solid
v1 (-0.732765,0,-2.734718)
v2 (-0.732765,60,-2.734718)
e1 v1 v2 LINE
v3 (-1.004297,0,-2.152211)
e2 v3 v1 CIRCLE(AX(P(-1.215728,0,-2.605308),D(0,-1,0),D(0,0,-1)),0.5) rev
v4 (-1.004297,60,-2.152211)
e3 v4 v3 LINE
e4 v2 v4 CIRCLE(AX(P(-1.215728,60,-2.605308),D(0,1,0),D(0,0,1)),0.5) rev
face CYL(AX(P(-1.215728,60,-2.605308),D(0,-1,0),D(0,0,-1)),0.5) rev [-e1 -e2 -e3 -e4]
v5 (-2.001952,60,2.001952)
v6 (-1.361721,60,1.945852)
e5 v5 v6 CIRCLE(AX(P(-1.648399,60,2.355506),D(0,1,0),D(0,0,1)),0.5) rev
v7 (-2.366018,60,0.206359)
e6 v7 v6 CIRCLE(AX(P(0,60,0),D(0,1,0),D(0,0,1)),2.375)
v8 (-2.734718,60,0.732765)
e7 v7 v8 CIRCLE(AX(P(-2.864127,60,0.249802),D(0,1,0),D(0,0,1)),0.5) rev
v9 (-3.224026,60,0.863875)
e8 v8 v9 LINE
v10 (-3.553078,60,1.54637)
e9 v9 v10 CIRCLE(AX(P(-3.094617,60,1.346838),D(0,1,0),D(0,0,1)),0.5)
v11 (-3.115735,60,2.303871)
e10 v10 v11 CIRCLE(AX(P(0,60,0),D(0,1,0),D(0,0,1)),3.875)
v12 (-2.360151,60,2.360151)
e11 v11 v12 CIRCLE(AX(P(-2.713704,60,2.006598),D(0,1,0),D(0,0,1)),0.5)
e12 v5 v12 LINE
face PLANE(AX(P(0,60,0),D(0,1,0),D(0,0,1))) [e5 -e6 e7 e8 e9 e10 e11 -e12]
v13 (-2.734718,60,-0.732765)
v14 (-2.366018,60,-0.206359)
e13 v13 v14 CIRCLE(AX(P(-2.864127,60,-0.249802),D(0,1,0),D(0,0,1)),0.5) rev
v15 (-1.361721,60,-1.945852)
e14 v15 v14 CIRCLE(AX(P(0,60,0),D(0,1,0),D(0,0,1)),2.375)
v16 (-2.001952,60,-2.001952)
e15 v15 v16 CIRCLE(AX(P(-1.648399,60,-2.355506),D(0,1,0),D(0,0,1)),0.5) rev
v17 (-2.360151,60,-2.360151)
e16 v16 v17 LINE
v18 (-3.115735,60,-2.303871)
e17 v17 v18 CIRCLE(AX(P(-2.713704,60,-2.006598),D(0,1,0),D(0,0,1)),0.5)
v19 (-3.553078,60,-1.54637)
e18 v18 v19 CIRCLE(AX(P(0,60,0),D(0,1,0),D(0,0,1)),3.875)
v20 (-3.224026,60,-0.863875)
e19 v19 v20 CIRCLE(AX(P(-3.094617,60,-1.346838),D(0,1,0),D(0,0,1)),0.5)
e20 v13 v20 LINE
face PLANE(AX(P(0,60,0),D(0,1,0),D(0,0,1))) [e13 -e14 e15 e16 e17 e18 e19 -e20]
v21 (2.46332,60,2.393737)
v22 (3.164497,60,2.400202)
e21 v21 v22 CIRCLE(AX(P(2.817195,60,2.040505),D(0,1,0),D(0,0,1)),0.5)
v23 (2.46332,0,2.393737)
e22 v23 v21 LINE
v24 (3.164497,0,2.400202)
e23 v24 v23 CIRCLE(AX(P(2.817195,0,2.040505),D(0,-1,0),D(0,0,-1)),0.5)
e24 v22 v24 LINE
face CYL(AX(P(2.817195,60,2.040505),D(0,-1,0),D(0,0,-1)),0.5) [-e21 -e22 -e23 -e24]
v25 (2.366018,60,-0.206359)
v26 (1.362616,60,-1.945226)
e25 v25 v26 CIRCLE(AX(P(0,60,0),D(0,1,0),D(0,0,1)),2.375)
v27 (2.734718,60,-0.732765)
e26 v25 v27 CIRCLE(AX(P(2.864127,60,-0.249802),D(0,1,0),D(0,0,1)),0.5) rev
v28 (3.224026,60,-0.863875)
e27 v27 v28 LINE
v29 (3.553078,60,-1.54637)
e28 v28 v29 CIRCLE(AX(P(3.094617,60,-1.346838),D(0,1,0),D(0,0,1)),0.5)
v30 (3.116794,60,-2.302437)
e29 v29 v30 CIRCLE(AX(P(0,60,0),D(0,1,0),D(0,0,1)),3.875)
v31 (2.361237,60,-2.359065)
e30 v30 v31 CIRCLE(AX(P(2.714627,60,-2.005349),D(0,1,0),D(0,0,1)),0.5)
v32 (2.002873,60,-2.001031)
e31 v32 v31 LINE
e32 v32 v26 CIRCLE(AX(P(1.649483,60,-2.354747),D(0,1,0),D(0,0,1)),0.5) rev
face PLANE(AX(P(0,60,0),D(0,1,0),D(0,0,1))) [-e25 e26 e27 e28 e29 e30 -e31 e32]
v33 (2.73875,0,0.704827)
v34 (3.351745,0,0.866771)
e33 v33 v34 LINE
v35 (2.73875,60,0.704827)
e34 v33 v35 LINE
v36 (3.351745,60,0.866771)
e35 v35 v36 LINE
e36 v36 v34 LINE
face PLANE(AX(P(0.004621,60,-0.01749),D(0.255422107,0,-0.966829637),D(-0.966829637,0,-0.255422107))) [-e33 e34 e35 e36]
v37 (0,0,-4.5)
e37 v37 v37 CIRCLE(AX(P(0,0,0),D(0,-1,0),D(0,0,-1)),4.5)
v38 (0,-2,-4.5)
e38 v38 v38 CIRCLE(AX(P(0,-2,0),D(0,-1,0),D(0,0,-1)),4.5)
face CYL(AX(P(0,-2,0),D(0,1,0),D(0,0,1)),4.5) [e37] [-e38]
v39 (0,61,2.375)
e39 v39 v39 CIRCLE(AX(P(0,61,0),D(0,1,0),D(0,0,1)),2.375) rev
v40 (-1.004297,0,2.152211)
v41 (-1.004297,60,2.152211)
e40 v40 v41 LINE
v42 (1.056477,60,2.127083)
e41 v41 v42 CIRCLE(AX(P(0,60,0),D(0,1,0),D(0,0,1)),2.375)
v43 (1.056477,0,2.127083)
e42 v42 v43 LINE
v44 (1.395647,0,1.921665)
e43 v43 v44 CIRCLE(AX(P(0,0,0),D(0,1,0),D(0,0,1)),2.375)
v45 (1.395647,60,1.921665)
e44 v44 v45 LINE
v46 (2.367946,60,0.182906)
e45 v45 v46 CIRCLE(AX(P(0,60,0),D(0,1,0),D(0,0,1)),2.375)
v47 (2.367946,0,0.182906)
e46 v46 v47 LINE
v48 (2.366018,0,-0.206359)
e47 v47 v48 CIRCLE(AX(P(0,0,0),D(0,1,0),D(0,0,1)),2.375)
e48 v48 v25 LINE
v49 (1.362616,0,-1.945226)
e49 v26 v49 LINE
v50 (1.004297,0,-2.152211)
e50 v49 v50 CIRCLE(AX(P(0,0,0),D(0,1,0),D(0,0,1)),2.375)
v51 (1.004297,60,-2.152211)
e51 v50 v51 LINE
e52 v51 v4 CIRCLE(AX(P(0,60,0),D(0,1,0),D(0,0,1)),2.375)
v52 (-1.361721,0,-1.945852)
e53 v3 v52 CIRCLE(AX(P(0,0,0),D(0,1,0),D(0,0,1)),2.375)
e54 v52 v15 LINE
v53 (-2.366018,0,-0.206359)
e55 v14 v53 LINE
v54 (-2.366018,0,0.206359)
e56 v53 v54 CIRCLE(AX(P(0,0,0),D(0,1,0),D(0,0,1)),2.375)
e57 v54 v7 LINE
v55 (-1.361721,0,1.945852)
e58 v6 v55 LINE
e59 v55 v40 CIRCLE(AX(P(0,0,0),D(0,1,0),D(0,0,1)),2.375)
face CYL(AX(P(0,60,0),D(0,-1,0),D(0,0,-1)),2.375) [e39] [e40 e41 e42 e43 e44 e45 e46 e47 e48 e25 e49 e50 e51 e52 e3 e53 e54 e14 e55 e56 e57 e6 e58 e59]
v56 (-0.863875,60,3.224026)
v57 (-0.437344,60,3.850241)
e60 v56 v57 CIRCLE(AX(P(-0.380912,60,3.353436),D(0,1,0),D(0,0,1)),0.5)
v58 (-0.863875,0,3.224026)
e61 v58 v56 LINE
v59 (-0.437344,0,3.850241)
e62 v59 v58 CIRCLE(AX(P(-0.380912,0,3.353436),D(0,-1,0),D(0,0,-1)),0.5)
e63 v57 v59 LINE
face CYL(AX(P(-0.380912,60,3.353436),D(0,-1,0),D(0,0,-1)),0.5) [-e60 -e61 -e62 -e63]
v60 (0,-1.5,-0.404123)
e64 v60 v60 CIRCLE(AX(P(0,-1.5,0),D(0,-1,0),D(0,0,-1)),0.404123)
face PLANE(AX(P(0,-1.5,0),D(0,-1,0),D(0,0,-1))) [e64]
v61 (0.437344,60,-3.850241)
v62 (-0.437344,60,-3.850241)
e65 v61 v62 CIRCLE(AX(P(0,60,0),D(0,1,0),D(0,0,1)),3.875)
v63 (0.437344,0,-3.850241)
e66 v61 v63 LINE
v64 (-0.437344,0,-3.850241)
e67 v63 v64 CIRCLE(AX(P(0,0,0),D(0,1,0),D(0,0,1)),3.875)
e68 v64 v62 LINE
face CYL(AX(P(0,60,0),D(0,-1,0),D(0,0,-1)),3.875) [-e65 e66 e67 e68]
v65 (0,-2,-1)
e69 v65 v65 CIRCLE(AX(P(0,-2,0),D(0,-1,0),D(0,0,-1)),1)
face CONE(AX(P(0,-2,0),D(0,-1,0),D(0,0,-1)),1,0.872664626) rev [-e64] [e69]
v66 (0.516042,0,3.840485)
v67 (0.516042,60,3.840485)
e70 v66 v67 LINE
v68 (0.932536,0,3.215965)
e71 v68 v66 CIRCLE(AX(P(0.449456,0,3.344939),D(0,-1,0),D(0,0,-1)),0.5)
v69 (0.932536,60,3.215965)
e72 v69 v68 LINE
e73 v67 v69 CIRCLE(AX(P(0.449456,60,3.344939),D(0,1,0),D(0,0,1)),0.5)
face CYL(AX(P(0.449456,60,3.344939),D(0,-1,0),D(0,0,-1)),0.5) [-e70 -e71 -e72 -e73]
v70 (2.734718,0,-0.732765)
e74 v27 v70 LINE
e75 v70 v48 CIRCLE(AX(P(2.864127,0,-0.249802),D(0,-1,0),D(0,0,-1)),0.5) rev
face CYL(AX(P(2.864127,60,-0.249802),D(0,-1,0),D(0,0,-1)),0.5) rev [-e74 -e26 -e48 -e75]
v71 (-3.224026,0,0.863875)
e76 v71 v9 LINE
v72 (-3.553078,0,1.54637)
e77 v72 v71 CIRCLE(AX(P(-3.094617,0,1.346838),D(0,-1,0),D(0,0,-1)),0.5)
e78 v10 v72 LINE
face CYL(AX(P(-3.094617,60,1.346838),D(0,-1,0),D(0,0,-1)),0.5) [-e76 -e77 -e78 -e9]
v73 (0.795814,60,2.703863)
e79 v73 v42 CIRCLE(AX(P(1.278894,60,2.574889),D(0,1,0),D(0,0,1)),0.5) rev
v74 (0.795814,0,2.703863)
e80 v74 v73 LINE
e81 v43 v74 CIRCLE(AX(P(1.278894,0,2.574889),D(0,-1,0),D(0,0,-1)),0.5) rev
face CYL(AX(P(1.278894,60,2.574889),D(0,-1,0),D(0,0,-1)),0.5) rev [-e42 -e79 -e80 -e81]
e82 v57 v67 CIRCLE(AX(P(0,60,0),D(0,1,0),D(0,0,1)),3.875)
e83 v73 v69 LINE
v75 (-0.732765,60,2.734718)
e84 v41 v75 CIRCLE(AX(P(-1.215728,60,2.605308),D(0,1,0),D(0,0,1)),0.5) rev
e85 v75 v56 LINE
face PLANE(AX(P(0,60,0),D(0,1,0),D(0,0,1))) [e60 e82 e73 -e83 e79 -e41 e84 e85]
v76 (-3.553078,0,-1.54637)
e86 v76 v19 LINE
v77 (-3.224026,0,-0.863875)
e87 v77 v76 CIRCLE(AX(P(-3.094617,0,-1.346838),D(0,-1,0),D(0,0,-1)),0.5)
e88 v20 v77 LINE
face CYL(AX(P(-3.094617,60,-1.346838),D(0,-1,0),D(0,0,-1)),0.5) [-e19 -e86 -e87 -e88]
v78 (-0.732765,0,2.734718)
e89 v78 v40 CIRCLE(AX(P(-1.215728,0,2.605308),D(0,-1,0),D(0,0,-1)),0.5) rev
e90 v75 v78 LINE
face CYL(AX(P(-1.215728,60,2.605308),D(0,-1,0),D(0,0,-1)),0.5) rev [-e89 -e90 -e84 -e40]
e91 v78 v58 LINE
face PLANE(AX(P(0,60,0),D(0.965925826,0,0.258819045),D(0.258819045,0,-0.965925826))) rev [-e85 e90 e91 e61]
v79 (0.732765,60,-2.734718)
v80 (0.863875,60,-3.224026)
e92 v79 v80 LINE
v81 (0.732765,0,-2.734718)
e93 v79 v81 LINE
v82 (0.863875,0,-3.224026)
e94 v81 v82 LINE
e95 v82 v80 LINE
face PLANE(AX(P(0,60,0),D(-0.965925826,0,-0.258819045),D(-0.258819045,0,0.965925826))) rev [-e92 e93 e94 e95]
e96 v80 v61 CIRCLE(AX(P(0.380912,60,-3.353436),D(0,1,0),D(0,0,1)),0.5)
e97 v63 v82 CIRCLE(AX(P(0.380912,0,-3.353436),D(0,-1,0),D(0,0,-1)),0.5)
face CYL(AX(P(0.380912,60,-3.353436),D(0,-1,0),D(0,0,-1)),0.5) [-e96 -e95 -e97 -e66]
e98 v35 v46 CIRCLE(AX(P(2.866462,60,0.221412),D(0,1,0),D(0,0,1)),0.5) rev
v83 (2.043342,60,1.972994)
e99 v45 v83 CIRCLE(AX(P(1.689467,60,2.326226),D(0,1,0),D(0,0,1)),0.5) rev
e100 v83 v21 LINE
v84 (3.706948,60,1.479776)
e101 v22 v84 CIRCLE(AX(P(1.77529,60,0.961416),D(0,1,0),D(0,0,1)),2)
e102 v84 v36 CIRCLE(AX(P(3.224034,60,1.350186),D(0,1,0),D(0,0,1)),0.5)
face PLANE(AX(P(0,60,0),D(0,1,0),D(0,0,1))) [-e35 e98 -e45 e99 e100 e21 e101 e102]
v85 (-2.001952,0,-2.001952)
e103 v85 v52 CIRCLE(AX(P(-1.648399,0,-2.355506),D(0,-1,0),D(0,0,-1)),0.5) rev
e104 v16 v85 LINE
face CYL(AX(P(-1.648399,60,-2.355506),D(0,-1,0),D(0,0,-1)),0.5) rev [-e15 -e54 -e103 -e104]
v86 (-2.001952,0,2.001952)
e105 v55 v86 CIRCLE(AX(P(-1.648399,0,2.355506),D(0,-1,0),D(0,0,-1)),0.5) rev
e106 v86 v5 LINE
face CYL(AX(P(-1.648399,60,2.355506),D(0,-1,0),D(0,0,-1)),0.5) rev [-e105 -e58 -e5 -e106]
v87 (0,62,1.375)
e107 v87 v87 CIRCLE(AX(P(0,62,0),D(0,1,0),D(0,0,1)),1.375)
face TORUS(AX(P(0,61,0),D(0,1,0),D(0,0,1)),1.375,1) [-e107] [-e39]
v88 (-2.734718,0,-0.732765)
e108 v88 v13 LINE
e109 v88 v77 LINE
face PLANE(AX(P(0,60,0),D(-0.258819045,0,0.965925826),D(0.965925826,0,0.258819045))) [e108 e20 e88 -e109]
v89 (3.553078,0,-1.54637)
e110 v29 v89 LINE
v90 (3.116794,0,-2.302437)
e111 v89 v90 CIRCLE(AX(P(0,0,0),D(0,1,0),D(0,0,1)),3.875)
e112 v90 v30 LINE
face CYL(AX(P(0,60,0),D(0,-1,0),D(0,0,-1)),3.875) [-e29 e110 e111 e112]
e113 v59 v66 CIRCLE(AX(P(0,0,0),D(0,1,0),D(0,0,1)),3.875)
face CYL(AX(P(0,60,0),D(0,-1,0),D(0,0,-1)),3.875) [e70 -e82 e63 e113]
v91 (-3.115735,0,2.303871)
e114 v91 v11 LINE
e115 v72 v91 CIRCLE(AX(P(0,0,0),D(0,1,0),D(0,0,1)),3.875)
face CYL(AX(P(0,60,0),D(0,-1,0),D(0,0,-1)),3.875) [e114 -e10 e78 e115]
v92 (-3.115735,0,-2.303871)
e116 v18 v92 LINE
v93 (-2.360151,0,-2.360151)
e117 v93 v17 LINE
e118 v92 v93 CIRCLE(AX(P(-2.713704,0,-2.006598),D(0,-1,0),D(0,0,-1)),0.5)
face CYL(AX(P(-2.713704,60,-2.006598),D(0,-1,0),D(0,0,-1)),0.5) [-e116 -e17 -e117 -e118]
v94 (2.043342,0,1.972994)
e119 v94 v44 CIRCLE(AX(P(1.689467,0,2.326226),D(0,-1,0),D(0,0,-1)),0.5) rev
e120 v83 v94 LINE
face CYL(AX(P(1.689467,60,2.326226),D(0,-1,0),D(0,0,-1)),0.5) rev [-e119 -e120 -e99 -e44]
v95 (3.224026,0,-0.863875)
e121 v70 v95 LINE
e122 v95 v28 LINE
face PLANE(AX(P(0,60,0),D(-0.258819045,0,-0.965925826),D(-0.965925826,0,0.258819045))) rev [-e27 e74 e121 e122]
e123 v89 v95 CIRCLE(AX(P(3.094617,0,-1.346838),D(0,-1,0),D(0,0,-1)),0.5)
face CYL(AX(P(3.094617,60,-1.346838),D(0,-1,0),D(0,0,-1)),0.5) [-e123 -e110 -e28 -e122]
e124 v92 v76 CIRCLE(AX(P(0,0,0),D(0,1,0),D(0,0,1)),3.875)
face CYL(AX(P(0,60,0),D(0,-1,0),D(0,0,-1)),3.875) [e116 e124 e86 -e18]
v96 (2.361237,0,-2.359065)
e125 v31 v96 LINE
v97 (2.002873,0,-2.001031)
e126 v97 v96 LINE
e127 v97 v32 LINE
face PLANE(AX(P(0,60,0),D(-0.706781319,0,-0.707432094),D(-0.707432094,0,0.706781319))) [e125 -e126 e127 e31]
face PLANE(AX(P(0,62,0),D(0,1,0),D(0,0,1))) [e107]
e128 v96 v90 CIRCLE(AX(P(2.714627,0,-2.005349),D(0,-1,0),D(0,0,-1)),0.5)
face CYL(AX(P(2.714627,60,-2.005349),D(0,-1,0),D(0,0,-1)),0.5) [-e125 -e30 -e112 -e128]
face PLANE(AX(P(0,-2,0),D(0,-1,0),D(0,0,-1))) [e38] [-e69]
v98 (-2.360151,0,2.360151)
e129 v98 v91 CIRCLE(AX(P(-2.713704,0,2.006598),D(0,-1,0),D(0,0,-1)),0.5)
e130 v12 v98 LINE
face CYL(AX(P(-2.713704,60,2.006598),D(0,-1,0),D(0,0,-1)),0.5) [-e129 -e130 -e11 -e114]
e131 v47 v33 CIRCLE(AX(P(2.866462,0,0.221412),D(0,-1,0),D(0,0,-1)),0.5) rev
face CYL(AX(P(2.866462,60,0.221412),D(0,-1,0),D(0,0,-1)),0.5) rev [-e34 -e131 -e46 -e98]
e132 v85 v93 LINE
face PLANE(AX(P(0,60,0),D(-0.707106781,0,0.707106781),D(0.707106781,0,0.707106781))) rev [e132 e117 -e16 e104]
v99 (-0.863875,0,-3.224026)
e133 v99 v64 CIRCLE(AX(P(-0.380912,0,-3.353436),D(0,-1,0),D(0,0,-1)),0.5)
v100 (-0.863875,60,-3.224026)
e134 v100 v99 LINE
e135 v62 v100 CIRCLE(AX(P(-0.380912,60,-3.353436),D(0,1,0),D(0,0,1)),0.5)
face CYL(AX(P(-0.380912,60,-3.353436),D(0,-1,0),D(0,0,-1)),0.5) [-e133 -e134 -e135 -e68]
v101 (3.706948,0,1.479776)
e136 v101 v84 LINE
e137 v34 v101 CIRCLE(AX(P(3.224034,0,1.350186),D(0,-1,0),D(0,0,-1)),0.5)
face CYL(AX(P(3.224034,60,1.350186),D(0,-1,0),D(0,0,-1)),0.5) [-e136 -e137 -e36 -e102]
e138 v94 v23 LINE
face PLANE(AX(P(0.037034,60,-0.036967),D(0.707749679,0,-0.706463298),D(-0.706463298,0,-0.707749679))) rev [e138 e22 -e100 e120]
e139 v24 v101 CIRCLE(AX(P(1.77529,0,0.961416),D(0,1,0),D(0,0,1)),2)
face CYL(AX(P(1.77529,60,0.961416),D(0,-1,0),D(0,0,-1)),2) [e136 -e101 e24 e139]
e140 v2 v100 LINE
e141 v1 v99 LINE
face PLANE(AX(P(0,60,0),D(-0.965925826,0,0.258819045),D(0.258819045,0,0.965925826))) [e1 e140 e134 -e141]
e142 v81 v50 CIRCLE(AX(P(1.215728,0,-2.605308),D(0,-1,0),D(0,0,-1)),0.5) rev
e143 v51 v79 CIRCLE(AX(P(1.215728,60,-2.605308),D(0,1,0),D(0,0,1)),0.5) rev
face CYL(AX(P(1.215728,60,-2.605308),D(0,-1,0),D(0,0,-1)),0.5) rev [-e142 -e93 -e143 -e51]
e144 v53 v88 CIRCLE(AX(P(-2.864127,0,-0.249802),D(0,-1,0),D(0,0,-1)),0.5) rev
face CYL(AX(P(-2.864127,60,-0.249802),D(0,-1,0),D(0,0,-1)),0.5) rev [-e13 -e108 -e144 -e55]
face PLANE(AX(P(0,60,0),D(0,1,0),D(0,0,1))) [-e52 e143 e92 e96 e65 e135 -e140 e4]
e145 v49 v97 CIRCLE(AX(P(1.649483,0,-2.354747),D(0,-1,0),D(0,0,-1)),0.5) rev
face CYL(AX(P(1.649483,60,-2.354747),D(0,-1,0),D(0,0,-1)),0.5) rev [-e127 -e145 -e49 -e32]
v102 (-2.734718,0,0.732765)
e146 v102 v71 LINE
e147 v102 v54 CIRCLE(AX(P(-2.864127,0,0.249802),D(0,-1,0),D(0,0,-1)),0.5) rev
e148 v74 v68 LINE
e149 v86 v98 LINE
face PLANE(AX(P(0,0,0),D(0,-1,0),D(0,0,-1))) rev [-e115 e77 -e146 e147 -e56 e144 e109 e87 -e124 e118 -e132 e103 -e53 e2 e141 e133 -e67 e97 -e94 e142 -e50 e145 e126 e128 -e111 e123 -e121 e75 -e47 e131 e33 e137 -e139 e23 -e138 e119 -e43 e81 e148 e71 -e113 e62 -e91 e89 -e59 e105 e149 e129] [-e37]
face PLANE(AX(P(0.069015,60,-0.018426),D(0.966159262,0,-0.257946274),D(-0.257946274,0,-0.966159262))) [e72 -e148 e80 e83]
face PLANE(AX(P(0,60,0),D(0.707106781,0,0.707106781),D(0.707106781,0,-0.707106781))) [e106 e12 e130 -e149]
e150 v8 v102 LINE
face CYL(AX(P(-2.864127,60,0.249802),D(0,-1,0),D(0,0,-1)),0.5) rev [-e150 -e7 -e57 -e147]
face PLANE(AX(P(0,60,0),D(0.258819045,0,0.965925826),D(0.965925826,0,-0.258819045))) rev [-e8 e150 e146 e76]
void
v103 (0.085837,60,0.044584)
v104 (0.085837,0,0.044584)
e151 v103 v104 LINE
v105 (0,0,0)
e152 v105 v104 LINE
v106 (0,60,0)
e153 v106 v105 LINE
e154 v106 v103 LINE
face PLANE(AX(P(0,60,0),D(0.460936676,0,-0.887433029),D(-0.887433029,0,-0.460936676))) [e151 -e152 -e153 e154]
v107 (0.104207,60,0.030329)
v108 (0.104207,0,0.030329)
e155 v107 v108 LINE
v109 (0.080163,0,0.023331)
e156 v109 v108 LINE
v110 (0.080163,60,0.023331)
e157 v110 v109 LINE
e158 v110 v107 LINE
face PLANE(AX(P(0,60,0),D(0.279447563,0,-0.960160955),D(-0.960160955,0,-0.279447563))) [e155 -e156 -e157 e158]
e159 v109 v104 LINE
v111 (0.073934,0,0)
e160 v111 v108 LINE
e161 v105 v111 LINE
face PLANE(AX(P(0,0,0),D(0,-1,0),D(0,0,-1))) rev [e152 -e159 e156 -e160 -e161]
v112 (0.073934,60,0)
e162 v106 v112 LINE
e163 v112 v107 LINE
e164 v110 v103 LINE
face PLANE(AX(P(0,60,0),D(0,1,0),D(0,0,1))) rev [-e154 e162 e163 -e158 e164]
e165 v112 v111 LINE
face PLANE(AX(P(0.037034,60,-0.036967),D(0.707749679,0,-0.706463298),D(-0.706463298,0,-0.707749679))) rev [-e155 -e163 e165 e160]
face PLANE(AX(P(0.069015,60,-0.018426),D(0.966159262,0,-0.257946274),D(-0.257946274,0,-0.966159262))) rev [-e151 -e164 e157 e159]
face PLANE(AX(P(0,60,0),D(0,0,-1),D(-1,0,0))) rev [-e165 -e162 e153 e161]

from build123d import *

# Parameters (mm, degrees)
BOSS_EXTRUDE1_DEPTH = 60
SKETCH3_R           = 4.5
BOSS_EXTRUDE2_DEPTH = 2
SKETCH4_R           = 2.375
BOSS_EXTRUDE3_DEPTH = 2
FILLET1_R           = 0.5
SKETCH6_R           = 1
CUT_EXTRUDE4_DEPTH  = 0.5
CUT_EXTRUDE4_DRAFT  = -50
FILLET2_R           = 1


with BuildPart() as part:
    # Sketch2 → Boss-Extrude1 (new body)
    with BuildSketch(Plane(origin=(0, 0, 0), x_dir=(1, 0, 0), z_dir=(0, 1, 0))):
        with BuildLine():
            Line((3.775215965, -0.978645895), (2.300774305, -0.58912019))
            ThreePointArc((2.300774305, -0.58912019), (2.374963211, 0.013219106), (2.294073837, 0.614695232))
            Line((2.294073837, 0.614695232), (3.742962577, 1.0029238))
            ThreePointArc((3.742962577, 1.0029238), (3.356294138, 1.936727823), (2.741299364, 2.73877761))
            Line((2.741299364, 2.73877761), (1.680151223, 1.678605632))
            ThreePointArc((1.680151223, 1.678605632), (1.187973207, 2.056537055), (0.614695232, 2.294073837))
            Line((0.614695232, 2.294073837), (1.0029238, 3.742962577))
            ThreePointArc((1.0029238, 3.742962577), (0, 3.875), (-1.0029238, 3.742962577))
            Line((-1.0029238, 3.742962577), (-0.614695232, 2.294073837))
            ThreePointArc((-0.614695232, 2.294073837), (-1.1875, 2.056810334), (-1.679378605, 1.679378605))
            Line((-1.679378605, 1.679378605), (-2.740038777, 2.740038777))
            ThreePointArc((-2.740038777, 2.740038777), (-3.35584844, 1.9375), (-3.742962577, 1.0029238))
            Line((-3.742962577, 1.0029238), (-2.294073837, 0.614695232))
            ThreePointArc((-2.294073837, 0.614695232), (-2.375, 0), (-2.294073837, -0.614695232))
            Line((-2.294073837, -0.614695232), (-3.742962577, -1.0029238))
            ThreePointArc((-3.742962577, -1.0029238), (-3.35584844, -1.9375), (-2.740038777, -2.740038777))
            Line((-2.740038777, -2.740038777), (-1.679378605, -1.679378605))
            ThreePointArc((-1.679378605, -1.679378605), (-1.1875, -2.056810334), (-0.614695232, -2.294073837))
            Line((-0.614695232, -2.294073837), (-1.0029238, -3.742962577))
            ThreePointArc((-1.0029238, -3.742962577), (0.033967076, -3.874851125), (1.068386506, -3.724805401))
            Line((1.068386506, -3.724805401), (0.681359786, -2.275164575))
            ThreePointArc((0.681359786, -2.275164575), (1.238849907, -2.026296106), (1.714477211, -1.643530618))
            Line((1.714477211, -1.643530618), (2.767163136, -2.698133353))
            ThreePointArc((2.767163136, -2.698133353), (3.500652231, -1.972912562), (3.775215965, -0.978645895))
        make_face()
        Polygon((0.085836926, -0.044584082), (0, 0), (0.073933818, 0), (0.104207494, -0.030328801), (0.080162685, -0.023330742), align=None, mode=Mode.SUBTRACT)
    extrude(amount=BOSS_EXTRUDE1_DEPTH)

    # Sketch3 → Boss-Extrude2 (add)
    with BuildSketch(Plane.XZ):
        with Locations(Location((0, 0, 0), (0, 0, 270))):
            Circle(SKETCH3_R)
    extrude(amount=BOSS_EXTRUDE2_DEPTH)

    # Sketch4 → Boss-Extrude3 (add)
    with BuildSketch(Plane(origin=(0, 60, 0), x_dir=(1, 0, 0), z_dir=(0, 1, 0))):
        with Locations(Location((0, 0, 0), (0, 0, 75))):
            Circle(SKETCH4_R)
    extrude(amount=BOSS_EXTRUDE3_DEPTH)

    # Fillet1
    # the kernel refuses this fillet: 0.5 mm, written as the material it adds along each edge
    with BuildSketch(Plane(origin=(-2.294073837, -1.140469783, 0.614695232), x_dir=(-0.965925826289068, 0, 0.2588190451025218), z_dir=(0, 1, 0)), Plane(origin=(-1.679378605, -1.140469783, -1.679378605), x_dir=(-0.7071067811865478, 0, -0.7071067811865474), z_dir=(0, 1, 0)), Plane(origin=(0.614695232, -1.140469783, -2.294073837), x_dir=(0.2588190451025215, 0, -0.9659258262890681), z_dir=(0, 1, 0)), Plane(origin=(2.294073837, -1.140469783, -0.614695232), x_dir=(0.9659258262890681, 0, -0.2588190451025215), z_dir=(0, 1, 0)), Plane(origin=(-0.614695232, -1.140469783, 2.294073837), x_dir=(-0.2588190451025215, 0, 0.9659258262890681), z_dir=(0, 1, 0))) as fillet1_piece_1:
        with BuildLine():
            CenterArc((0.456187913, -0.5), FILLET1_R, 90, 79.984589832)
            ThreePointArc((-0.036192593, -0.413043478), (-0.00906545, -0.20731306), (0, 0))
            Line((0, 0), (0.456187913, 0))
        make_face()
    extrude(amount=61.140469783)
    with BuildSketch(Plane(origin=(-2.294073837, -1.140469783, -0.614695232), x_dir=(-0.17351574004952178, 0, 0.9848310961556133), z_dir=(0, 1, 0)), Plane(origin=(-1.679378605, -1.140469783, 1.679378605), x_dir=(0.7661308776828862, 0, 0.6426845869171364), z_dir=(0, 1, 0))) as fillet1_piece_2:
        with BuildLine():
            CenterArc((0.458270974, -0.498091484), FILLET1_R, 95.007705084, 79.984589832)
            Line((-0.03982051, -0.45444663), (0, 0))
            ThreePointArc((0, 0), (0.20731306, -0.00906545), (0.414626119, 0))
        make_face()
    extrude(amount=61.140469783)
    with BuildSketch(Plane(origin=(-0.614695232, -1.140469783, -2.294073837), x_dir=(-0.258819045102522, 0, -0.965925826289068), z_dir=(0, 1, 0)), Plane(origin=(1.680151223, -1.140469783, -1.678605632), x_dir=(0.707432093873984, 0, -0.7067813187663288), z_dir=(0, 1, 0))) as fillet1_piece_3:
        with BuildLine():
            CenterArc((0.456187913, 0.5), FILLET1_R, 190.015410168, 79.984589832)
            ThreePointArc((-0.036192593, 0.413043478), (-0.00906545, 0.20731306), (0, 0))
            Line((0, 0), (0.456187913, 0))
        make_face()
    extrude(amount=61.140469783)
    with BuildSketch(Plane(origin=(2.300774305, -1.132506036, 0.58912019), x_dir=(0.16314582309469597, 0, -0.9866019665532569), z_dir=(0, 1, 0))) as fillet1_piece_4:
        with BuildLine():
            CenterArc((0.455070929, -0.498118095), FILLET1_R, 94.972648578, 79.61829146)
            Line((-0.042702606, -0.450985227), (0, 0))
            ThreePointArc((0, 0), (0.20586542, -0.008939048), (0.411730841, 0))
        make_face()
    extrude(amount=61.132506036)
    with BuildSketch(Plane(origin=(1.714477211, -1.163771178, 1.643530618), x_dir=(0.7064632978713467, 0, 0.7077496794494088), z_dir=(0, 1, 0))) as fillet1_piece_5:
        with BuildLine():
            CenterArc((0.465508471, -0.5), FILLET1_R, 90, 81.041880237)
            ThreePointArc((-0.02839274, -0.422143763), (-0.00477723, -0.211705398), (0, 0))
            Line((0, 0), (0.465508471, 0))
        make_face()
    extrude(amount=61.163771178)
    with BuildSketch(Plane(origin=(0.681359786, -1.109284133, 2.275164575), x_dir=(0.9301474254657973, 0, -0.3671862836481626), z_dir=(0, 1, 0))) as fillet1_piece_6:
        with BuildLine():
            CenterArc((0.445739753, -0.498194619), FILLET1_R, 94.870436099, 78.535607624)
            Line((-0.050952689, -0.440778436), (0, 0))
            ThreePointArc((0, 0), (0.201644174, -0.008575561), (0.403288348, 0))
        make_face()
    extrude(amount=61.109284133)
    # the kernel refuses this fillet: 0.5 mm, written as the material it takes off along each edge
    with BuildSketch(Plane(origin=(-2.740038777, 0, 2.740038777), x_dir=(-0.6526300069150477, 0, -0.7576767609436524), z_dir=(0, 1, 0)), Plane(origin=(-3.742962577, 0, -1.0029238), x_dir=(0.32985231937679765, 0, -0.9440325457322681), z_dir=(0, 1, 0)), Plane(origin=(-1.0029238, 0, -3.742962577), x_dir=(0.982482326291838, 0, -0.18635578478860887), z_dir=(0, 1, 0)), Plane(origin=(2.741299364, 0, -2.73877761), x_dir=(0.6522812796019254, 0, 0.7579769998363239), z_dir=(0, 1, 0))) as fillet1_2_piece_1:
        with BuildLine():
            CenterArc((0.538524723, -0.49861874), FILLET1_R, 85.740187873, 98.519624254)
            Line((0.039905983, -0.535758376), (0, 0))
            ThreePointArc((0, 0), (0.287832179, 0.010704768), (0.575664359, 0))
        make_face()
    extrude(amount=61.439160897, mode=Mode.SUBTRACT)
    with BuildSketch(Plane(origin=(-3.742962577, 0, 1.0029238), x_dir=(0.9659258262890679, 0, -0.2588190451025218), z_dir=(0, 1, 0)), Plane(origin=(-2.740038777, 0, -2.740038777), x_dir=(0.7071067811865476, 0, 0.7071067811865476), z_dir=(0, 1, 0)), Plane(origin=(1.0029238, 0, -3.742962577), x_dir=(-0.25881904510252196, 0, 0.965925826289068), z_dir=(0, 1, 0)), Plane(origin=(3.742962577, 0, -1.0029238), x_dir=(-0.9659258262890681, 0, 0.25881904510252185), z_dir=(0, 1, 0)), Plane(origin=(-1.0029238, 0, 3.742962577), x_dir=(0.2588190451025216, 0, -0.9659258262890681), z_dir=(0, 1, 0))) as fillet1_2_piece_2:
        with BuildLine():
            CenterArc((0.537242519, -0.5), FILLET1_R, 90, 98.519624254)
            ThreePointArc((0.04275993, -0.574074074), (0.010704768, -0.287832179), (0, 0))
            Line((0, 0), (0.537242519, 0))
        make_face()
    extrude(amount=61.439160897, mode=Mode.SUBTRACT)
    with BuildSketch(Plane(origin=(3.775215965, 0, 0.978645895), x_dir=(-0.13498089829276533, 0, 0.9908482008340522), z_dir=(0, 1, 0))) as fillet1_2_piece_3:
        with BuildLine():
            CenterArc((0.442538799, -0.49598715), FILLET1_R, 82.736098253, 90.22281865)
            Line((-0.053690457, -0.434696649), (0, 0))
            ThreePointArc((0, 0), (0.252879314, 0.016051399), (0.505758627, 0))
        make_face()
    extrude(amount=61.264396568, mode=Mode.SUBTRACT)
    with BuildSketch(Plane(origin=(2.767163136, 0, 2.698133353), x_dir=(0.8000663385432955, 0, -0.5999115384203949), z_dir=(0, 1, 0))) as fillet1_2_piece_4:
        with BuildLine():
            CenterArc((0.434547354, 0.496131331), FILLET1_R, 188.084320914, 89.047719887)
            Line((-0.060483736, 0.425816179), (0, 0))
            ThreePointArc((0, 0), (0.248312773, -0.015474675), (0.496625547, 0))
        make_face()
    extrude(amount=61.241563867, mode=Mode.SUBTRACT)
    with BuildSketch(Plane(origin=(1.068386506, 0, 3.724805401), x_dir=(-0.9787647804449897, 0, 0.20498659605074468), z_dir=(0, 1, 0))) as fillet1_2_piece_5:
        with BuildLine():
            CenterArc((0.527919562, -0.498672678), FILLET1_R, 85.824226653, 97.295295094)
            Line((0.028660468, -0.525882193), (0, 0))
            ThreePointArc((0, 0), (0.282163904, 0.010286747), (0.564327807, 0))
        make_face()
    extrude(amount=61.410819518, mode=Mode.SUBTRACT)


with BuildPart() as cut_extrude4_tool:
    # Sketch6 → Cut-Extrude4 (with draft: the straight prism first)
    with BuildSketch(Plane.XZ.offset(2)):
        Circle(SKETCH6_R)
    extrude(amount=-CUT_EXTRUDE4_DEPTH)
    # Cut-Extrude4: the draft: its side faces are tilted about the plane it starts from
    cut_extrude4_sides = [cut_extrude4_tool.faces().sort_by_distance(p)[0] for p in [
        (-1, -1.75, 0),
    ]]
    draft(cut_extrude4_sides, Plane.XZ.offset(2), CUT_EXTRUDE4_DRAFT)


with BuildPart() as part_1:
    add(part.part)

    # Cut-Extrude4: cut by cut_extrude4_tool
    add(cut_extrude4_tool.part, mode=Mode.SUBTRACT)

    # Fillet2
    fillet2_edges = [part_1.edges().sort_by_distance(p)[0] for p in [
        (-0.614695232, 62, 2.294073837),
    ]]
    fillet(fillet2_edges, radius=FILLET2_R)


solid = part_1.part
